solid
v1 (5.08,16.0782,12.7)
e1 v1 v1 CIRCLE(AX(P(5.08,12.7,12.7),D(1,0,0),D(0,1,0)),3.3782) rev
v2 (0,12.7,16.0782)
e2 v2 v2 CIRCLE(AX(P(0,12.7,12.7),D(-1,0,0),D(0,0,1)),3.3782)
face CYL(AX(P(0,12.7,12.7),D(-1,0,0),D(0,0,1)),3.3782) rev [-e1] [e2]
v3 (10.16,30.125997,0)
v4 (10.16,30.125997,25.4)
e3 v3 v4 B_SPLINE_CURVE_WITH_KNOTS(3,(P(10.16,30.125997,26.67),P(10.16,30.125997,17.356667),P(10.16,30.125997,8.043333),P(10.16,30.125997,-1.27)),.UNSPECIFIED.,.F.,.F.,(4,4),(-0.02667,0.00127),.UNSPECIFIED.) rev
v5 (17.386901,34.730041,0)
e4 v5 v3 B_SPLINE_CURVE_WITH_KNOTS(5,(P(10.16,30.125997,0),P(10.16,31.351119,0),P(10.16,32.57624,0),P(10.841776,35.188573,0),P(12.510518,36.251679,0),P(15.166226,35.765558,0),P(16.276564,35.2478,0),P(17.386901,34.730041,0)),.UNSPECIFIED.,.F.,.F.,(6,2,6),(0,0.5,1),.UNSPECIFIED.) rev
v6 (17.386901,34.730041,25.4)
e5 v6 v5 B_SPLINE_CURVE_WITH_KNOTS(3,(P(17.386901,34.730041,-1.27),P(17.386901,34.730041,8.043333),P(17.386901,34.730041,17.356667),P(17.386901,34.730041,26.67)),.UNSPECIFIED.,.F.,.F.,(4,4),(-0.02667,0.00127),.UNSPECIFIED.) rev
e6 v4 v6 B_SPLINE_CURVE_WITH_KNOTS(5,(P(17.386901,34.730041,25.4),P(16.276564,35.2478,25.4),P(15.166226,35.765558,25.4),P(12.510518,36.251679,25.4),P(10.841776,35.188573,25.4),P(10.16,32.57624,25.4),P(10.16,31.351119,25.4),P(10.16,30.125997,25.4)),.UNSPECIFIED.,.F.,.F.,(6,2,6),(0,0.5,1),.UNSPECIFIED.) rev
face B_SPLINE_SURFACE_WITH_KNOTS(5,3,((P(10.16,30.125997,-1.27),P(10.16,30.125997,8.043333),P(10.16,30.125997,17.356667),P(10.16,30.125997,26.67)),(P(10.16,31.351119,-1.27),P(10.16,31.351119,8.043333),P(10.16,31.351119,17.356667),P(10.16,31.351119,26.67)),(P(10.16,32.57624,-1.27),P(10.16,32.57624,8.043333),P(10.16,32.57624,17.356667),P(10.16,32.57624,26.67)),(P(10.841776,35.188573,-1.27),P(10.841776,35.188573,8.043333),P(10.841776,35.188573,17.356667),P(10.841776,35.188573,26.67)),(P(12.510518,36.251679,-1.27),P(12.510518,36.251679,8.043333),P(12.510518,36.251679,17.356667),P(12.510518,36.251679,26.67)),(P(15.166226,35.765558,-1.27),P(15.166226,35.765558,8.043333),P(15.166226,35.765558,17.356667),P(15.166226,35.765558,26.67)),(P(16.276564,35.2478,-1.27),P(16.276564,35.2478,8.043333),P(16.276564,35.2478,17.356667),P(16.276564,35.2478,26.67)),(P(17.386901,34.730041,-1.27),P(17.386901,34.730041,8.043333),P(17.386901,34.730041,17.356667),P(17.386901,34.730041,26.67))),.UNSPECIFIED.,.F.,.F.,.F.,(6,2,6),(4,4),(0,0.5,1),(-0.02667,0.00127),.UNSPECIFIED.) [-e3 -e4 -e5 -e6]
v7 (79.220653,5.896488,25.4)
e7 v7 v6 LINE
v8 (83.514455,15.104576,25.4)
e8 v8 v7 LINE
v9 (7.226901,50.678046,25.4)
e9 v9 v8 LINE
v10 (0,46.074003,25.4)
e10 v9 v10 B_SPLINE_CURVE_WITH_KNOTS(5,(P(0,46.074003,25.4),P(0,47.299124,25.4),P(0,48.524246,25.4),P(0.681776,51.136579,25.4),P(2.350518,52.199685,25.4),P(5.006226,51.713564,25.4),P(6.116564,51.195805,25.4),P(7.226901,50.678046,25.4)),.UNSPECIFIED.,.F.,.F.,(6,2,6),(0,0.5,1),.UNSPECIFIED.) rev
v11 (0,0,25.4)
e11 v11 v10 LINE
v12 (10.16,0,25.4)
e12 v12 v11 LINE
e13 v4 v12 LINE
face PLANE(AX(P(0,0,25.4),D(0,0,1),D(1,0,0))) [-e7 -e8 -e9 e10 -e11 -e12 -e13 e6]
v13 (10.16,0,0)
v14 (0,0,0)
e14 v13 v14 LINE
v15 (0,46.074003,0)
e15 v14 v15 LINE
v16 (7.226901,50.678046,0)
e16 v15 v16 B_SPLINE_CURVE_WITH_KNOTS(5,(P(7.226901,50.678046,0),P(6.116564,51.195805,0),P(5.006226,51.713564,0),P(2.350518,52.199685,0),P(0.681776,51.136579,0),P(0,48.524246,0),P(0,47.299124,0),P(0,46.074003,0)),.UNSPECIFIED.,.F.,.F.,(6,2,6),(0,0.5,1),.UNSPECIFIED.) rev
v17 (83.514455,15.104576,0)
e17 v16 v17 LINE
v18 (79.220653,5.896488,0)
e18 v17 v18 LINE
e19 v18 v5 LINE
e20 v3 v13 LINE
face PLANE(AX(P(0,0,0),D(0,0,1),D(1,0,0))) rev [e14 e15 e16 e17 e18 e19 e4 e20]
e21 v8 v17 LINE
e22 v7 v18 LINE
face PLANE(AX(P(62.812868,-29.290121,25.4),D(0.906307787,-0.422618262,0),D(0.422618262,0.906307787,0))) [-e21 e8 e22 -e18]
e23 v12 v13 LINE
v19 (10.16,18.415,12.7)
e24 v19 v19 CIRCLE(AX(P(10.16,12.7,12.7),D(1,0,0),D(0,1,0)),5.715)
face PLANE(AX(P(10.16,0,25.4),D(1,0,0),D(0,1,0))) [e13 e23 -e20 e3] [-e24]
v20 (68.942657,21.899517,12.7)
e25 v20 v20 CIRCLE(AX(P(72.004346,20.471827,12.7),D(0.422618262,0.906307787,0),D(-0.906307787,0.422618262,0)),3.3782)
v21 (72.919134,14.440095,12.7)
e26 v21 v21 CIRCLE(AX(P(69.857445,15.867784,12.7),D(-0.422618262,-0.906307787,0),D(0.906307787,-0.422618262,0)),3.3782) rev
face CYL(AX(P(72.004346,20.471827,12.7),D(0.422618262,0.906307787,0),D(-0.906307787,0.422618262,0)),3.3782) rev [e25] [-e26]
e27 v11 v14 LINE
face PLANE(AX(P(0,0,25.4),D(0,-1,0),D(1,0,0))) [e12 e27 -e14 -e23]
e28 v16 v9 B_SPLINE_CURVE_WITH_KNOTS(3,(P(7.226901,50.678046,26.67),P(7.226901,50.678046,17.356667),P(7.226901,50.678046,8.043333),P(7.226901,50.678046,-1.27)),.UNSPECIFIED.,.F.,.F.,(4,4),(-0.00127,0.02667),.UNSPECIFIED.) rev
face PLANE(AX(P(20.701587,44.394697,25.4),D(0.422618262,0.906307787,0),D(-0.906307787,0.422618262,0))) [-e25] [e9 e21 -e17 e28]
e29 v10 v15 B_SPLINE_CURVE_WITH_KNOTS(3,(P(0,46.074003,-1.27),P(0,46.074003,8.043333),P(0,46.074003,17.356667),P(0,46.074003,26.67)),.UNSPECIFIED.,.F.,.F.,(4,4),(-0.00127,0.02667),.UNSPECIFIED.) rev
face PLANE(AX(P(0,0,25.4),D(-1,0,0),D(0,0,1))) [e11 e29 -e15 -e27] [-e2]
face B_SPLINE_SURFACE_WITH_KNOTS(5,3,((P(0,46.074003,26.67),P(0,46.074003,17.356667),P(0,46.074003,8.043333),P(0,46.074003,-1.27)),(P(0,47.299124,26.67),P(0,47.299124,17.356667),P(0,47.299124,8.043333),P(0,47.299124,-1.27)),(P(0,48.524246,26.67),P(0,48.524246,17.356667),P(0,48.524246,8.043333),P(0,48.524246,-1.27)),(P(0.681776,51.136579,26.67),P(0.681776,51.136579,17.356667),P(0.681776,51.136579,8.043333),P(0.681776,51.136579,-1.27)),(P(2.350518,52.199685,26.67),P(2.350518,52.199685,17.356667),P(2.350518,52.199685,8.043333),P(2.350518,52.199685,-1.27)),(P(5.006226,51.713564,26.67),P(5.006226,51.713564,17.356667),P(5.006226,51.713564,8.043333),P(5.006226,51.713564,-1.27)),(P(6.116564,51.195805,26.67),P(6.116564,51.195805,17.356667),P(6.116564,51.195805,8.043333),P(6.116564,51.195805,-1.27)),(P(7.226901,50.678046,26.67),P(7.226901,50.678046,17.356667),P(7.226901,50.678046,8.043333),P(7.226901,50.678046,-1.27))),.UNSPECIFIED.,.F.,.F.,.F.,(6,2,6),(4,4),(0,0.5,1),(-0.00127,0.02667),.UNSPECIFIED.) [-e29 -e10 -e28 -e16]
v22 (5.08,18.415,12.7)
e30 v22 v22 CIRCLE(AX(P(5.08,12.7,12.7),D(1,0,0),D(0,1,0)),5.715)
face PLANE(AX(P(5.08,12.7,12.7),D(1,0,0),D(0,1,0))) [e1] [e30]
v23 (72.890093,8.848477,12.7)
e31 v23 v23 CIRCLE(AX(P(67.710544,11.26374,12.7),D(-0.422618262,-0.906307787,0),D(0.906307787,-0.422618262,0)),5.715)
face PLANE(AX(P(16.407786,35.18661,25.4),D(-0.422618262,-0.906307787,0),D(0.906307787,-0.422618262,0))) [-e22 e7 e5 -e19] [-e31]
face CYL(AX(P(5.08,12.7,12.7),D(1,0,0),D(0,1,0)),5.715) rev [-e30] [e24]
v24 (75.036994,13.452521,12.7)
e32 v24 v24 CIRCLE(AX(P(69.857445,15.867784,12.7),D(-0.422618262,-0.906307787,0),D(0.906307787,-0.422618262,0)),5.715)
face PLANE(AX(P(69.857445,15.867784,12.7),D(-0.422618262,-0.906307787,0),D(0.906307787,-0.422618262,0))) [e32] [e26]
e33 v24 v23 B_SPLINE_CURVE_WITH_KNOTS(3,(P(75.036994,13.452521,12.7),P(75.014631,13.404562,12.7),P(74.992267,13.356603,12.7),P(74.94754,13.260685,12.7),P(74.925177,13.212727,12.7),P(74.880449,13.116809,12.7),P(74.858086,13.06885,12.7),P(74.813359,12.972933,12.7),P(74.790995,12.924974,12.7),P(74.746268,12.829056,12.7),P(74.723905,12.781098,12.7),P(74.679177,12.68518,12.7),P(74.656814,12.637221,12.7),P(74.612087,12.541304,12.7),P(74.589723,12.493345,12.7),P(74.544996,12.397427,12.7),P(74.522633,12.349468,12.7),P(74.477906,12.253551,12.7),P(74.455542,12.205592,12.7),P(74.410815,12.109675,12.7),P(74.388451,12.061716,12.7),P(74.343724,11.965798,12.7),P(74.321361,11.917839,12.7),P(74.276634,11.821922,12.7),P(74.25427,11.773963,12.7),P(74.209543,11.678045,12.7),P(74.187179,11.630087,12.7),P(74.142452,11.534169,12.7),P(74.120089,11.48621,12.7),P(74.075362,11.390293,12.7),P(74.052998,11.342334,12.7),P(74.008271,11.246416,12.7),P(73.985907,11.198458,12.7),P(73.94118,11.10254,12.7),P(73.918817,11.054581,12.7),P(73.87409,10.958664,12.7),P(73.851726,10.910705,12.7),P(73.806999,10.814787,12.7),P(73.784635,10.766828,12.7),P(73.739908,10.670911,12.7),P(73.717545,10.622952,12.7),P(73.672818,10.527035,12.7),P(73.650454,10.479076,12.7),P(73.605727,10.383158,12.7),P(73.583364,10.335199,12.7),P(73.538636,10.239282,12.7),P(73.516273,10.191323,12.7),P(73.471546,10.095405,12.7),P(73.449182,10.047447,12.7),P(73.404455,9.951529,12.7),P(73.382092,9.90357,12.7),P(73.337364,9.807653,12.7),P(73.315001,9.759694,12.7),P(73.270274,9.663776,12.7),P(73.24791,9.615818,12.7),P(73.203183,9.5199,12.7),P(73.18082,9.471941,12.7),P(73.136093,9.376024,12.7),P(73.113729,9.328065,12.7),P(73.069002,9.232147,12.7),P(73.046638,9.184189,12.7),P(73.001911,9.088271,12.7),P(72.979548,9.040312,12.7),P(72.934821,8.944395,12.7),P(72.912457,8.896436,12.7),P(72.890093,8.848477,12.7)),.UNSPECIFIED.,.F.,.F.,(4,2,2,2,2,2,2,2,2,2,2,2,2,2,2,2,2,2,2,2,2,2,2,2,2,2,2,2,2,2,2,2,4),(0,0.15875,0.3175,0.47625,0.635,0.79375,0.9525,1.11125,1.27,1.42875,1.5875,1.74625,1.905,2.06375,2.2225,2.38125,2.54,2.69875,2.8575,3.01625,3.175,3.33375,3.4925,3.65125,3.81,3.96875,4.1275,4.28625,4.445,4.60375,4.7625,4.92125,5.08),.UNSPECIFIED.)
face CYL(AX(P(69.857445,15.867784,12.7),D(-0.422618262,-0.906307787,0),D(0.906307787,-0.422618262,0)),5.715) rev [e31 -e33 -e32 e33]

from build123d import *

# Parameters (mm, degrees)
BOSS_EXTRUDE1_DEPTH         = 25.4
F_1_4_CLEARANCE_HOLE1_D     = 6.7564
F_1_4_CLEARANCE_HOLE1_DEPTH = 10.16
F_1_4_CLEARANCE_HOLE1_TIP   = 2.029827343
F_1_4_CLEARANCE_HOLE2_D     = 6.7564
F_1_4_CLEARANCE_HOLE2_DEPTH = 10.16
F_1_4_CLEARANCE_HOLE2_TIP   = 2.029827343
SKETCH8_R                   = 5.715
CUT_EXTRUDE1_DEPTH          = 5.08
SKETCH9_R                   = 5.715
CUT_EXTRUDE2_DEPTH          = 5.08


with BuildPart() as part:
    # Sketch1 → Boss-Extrude1 (new body)
    with BuildSketch(Plane.XY):
        Polygon((10.16, 0), (0, 0), (0, 54.048005464), (83.514454911, 15.104575572), (79.220653372, 5.896488455), (10.16, 38.1), align=None)
    extrude(amount=BOSS_EXTRUDE1_DEPTH)

    # 1/4 Clearance Hole1
    with Locations(Plane.ZY):
        with Locations((12.7, 12.7)):
            Hole(F_1_4_CLEARANCE_HOLE1_D / 2, depth=F_1_4_CLEARANCE_HOLE1_DEPTH)
            with Locations((0, 0, -(F_1_4_CLEARANCE_HOLE1_DEPTH + F_1_4_CLEARANCE_HOLE1_TIP / 2))):  # 118° drill point
                Cone(0, F_1_4_CLEARANCE_HOLE1_D / 2, F_1_4_CLEARANCE_HOLE1_TIP, mode=Mode.SUBTRACT)

    # 1/4 Clearance Hole2
    with Locations(Plane(origin=(20.701587123, 44.394696852, 0), x_dir=(0.9063077870366483, -0.42261826174070316, 0), z_dir=(0.42261826174070316, 0.9063077870366483, 0))):
        with Locations((56.606331344, -12.7)):
            Hole(F_1_4_CLEARANCE_HOLE2_D / 2, depth=F_1_4_CLEARANCE_HOLE2_DEPTH)
            with Locations((0, 0, -(F_1_4_CLEARANCE_HOLE2_DEPTH + F_1_4_CLEARANCE_HOLE2_TIP / 2))):  # 118° drill point
                Cone(0, F_1_4_CLEARANCE_HOLE2_D / 2, F_1_4_CLEARANCE_HOLE2_TIP, mode=Mode.SUBTRACT)

    # Fillet1
    # a fillet whose section is not a circle: 5.08 mm, written as the material it adds along each edge (its section moved 0.00015 mm through the faces so that the kernel can cut it)
    with BuildSketch(Plane(origin=(10.16, 38.1, 0), x_dir=(0.9063157368032501, -0.4226012129925586, 0), z_dir=(0, 0, 1))) as fillet1_piece_1:
        with BuildLine():
            add(Edge.make_bspline([(7.974002733, 0), (6.748845081, 2.3047e-05), (5.523687428, 4.6093e-05), (2.911264627, -0.681700719), (1.848095837, -2.35047216), (2.334181059, -5.00626823), (2.851934169, -6.11664789), (3.369687279, -7.227027551)], knots=[0, 0, 0, 0, 0, 0, 0.5, 0.5, 1, 1, 1, 1, 1, 1], degree=5))
            Line((3.369687279, -7.227027551), (3.277605601, -7.269963835))
            ThreePointArc((3.277605601, -7.269963835), (1.592829935, -3.656418364), (-0.092081679, -0.042936283))
            Line((-0.092081679, -0.042936283), (1.911e-06, 0.1016))
            ThreePointArc((1.911e-06, 0.1016), (3.987003276, 0.101525), (7.974004644, 0.1016))
            Line((7.974004644, 0.1016), (7.974002733, 0))
        make_face()
    extrude(amount=25.4)
    # a fillet whose section is not a circle: 5.08 mm, written as the material it takes off along each edge (its section moved 0.00015 mm through the faces so that the kernel can cut it)
    with BuildSketch(Plane(origin=(0, 54.048005464, -19.935006833), x_dir=(-1.8811129744924416e-05, -0.9999999998230706, 0), z_dir=(0, 0, 1))) as fillet1_2_piece_1:
        with BuildLine():
            add(Edge.make_bspline([(7.974002733, 0), (6.748845081, -2.3047e-05), (5.523687428, -4.6093e-05), (2.911264627, 0.681700719), (1.848095837, 2.35047216), (2.334181059, 5.00626823), (2.851934169, 6.11664789), (3.369687279, 7.227027551)], knots=[0, 0, 0, 0, 0, 0, 0.5, 0.5, 1, 1, 1, 1, 1, 1], degree=5))
            Line((3.369687279, 7.227027551), (3.277605601, 7.269963835))
            ThreePointArc((3.277605601, 7.269963835), (1.592829935, 3.656418364), (-0.092081679, 0.042936283))
            Line((-0.092081679, 0.042936283), (1.911e-06, -0.1016))
            ThreePointArc((1.911e-06, -0.1016), (3.987003276, -0.101525), (7.974004644, -0.1016))
            Line((7.974004644, -0.1016), (7.974002733, 0))
        make_face()
    extrude(amount=65.270013666, mode=Mode.SUBTRACT)

    # Sketch8 → Cut-Extrude1 (cut)
    with BuildSketch(Plane(origin=(16.407785584, 35.186609736, 0), x_dir=(0.906307787036648, -0.42261826174070366, 0), z_dir=(-0.4226182617407036, -0.9063077870366479, 0))):
        with Locations((56.606331344, 12.7)):
            Circle(SKETCH8_R)
    extrude(amount=-CUT_EXTRUDE1_DEPTH, mode=Mode.SUBTRACT)

    # Sketch9 → Cut-Extrude2 (cut)
    with BuildSketch(Plane(origin=(10.16, 0, 0), x_dir=(0, 0, -1), z_dir=(1, 0, 0))):
        with Locations(Location((-12.7, 12.7, 0), (0, 0, 90))):
            Circle(SKETCH9_R)
    extrude(amount=-CUT_EXTRUDE2_DEPTH, mode=Mode.SUBTRACT)


solid = part.part
